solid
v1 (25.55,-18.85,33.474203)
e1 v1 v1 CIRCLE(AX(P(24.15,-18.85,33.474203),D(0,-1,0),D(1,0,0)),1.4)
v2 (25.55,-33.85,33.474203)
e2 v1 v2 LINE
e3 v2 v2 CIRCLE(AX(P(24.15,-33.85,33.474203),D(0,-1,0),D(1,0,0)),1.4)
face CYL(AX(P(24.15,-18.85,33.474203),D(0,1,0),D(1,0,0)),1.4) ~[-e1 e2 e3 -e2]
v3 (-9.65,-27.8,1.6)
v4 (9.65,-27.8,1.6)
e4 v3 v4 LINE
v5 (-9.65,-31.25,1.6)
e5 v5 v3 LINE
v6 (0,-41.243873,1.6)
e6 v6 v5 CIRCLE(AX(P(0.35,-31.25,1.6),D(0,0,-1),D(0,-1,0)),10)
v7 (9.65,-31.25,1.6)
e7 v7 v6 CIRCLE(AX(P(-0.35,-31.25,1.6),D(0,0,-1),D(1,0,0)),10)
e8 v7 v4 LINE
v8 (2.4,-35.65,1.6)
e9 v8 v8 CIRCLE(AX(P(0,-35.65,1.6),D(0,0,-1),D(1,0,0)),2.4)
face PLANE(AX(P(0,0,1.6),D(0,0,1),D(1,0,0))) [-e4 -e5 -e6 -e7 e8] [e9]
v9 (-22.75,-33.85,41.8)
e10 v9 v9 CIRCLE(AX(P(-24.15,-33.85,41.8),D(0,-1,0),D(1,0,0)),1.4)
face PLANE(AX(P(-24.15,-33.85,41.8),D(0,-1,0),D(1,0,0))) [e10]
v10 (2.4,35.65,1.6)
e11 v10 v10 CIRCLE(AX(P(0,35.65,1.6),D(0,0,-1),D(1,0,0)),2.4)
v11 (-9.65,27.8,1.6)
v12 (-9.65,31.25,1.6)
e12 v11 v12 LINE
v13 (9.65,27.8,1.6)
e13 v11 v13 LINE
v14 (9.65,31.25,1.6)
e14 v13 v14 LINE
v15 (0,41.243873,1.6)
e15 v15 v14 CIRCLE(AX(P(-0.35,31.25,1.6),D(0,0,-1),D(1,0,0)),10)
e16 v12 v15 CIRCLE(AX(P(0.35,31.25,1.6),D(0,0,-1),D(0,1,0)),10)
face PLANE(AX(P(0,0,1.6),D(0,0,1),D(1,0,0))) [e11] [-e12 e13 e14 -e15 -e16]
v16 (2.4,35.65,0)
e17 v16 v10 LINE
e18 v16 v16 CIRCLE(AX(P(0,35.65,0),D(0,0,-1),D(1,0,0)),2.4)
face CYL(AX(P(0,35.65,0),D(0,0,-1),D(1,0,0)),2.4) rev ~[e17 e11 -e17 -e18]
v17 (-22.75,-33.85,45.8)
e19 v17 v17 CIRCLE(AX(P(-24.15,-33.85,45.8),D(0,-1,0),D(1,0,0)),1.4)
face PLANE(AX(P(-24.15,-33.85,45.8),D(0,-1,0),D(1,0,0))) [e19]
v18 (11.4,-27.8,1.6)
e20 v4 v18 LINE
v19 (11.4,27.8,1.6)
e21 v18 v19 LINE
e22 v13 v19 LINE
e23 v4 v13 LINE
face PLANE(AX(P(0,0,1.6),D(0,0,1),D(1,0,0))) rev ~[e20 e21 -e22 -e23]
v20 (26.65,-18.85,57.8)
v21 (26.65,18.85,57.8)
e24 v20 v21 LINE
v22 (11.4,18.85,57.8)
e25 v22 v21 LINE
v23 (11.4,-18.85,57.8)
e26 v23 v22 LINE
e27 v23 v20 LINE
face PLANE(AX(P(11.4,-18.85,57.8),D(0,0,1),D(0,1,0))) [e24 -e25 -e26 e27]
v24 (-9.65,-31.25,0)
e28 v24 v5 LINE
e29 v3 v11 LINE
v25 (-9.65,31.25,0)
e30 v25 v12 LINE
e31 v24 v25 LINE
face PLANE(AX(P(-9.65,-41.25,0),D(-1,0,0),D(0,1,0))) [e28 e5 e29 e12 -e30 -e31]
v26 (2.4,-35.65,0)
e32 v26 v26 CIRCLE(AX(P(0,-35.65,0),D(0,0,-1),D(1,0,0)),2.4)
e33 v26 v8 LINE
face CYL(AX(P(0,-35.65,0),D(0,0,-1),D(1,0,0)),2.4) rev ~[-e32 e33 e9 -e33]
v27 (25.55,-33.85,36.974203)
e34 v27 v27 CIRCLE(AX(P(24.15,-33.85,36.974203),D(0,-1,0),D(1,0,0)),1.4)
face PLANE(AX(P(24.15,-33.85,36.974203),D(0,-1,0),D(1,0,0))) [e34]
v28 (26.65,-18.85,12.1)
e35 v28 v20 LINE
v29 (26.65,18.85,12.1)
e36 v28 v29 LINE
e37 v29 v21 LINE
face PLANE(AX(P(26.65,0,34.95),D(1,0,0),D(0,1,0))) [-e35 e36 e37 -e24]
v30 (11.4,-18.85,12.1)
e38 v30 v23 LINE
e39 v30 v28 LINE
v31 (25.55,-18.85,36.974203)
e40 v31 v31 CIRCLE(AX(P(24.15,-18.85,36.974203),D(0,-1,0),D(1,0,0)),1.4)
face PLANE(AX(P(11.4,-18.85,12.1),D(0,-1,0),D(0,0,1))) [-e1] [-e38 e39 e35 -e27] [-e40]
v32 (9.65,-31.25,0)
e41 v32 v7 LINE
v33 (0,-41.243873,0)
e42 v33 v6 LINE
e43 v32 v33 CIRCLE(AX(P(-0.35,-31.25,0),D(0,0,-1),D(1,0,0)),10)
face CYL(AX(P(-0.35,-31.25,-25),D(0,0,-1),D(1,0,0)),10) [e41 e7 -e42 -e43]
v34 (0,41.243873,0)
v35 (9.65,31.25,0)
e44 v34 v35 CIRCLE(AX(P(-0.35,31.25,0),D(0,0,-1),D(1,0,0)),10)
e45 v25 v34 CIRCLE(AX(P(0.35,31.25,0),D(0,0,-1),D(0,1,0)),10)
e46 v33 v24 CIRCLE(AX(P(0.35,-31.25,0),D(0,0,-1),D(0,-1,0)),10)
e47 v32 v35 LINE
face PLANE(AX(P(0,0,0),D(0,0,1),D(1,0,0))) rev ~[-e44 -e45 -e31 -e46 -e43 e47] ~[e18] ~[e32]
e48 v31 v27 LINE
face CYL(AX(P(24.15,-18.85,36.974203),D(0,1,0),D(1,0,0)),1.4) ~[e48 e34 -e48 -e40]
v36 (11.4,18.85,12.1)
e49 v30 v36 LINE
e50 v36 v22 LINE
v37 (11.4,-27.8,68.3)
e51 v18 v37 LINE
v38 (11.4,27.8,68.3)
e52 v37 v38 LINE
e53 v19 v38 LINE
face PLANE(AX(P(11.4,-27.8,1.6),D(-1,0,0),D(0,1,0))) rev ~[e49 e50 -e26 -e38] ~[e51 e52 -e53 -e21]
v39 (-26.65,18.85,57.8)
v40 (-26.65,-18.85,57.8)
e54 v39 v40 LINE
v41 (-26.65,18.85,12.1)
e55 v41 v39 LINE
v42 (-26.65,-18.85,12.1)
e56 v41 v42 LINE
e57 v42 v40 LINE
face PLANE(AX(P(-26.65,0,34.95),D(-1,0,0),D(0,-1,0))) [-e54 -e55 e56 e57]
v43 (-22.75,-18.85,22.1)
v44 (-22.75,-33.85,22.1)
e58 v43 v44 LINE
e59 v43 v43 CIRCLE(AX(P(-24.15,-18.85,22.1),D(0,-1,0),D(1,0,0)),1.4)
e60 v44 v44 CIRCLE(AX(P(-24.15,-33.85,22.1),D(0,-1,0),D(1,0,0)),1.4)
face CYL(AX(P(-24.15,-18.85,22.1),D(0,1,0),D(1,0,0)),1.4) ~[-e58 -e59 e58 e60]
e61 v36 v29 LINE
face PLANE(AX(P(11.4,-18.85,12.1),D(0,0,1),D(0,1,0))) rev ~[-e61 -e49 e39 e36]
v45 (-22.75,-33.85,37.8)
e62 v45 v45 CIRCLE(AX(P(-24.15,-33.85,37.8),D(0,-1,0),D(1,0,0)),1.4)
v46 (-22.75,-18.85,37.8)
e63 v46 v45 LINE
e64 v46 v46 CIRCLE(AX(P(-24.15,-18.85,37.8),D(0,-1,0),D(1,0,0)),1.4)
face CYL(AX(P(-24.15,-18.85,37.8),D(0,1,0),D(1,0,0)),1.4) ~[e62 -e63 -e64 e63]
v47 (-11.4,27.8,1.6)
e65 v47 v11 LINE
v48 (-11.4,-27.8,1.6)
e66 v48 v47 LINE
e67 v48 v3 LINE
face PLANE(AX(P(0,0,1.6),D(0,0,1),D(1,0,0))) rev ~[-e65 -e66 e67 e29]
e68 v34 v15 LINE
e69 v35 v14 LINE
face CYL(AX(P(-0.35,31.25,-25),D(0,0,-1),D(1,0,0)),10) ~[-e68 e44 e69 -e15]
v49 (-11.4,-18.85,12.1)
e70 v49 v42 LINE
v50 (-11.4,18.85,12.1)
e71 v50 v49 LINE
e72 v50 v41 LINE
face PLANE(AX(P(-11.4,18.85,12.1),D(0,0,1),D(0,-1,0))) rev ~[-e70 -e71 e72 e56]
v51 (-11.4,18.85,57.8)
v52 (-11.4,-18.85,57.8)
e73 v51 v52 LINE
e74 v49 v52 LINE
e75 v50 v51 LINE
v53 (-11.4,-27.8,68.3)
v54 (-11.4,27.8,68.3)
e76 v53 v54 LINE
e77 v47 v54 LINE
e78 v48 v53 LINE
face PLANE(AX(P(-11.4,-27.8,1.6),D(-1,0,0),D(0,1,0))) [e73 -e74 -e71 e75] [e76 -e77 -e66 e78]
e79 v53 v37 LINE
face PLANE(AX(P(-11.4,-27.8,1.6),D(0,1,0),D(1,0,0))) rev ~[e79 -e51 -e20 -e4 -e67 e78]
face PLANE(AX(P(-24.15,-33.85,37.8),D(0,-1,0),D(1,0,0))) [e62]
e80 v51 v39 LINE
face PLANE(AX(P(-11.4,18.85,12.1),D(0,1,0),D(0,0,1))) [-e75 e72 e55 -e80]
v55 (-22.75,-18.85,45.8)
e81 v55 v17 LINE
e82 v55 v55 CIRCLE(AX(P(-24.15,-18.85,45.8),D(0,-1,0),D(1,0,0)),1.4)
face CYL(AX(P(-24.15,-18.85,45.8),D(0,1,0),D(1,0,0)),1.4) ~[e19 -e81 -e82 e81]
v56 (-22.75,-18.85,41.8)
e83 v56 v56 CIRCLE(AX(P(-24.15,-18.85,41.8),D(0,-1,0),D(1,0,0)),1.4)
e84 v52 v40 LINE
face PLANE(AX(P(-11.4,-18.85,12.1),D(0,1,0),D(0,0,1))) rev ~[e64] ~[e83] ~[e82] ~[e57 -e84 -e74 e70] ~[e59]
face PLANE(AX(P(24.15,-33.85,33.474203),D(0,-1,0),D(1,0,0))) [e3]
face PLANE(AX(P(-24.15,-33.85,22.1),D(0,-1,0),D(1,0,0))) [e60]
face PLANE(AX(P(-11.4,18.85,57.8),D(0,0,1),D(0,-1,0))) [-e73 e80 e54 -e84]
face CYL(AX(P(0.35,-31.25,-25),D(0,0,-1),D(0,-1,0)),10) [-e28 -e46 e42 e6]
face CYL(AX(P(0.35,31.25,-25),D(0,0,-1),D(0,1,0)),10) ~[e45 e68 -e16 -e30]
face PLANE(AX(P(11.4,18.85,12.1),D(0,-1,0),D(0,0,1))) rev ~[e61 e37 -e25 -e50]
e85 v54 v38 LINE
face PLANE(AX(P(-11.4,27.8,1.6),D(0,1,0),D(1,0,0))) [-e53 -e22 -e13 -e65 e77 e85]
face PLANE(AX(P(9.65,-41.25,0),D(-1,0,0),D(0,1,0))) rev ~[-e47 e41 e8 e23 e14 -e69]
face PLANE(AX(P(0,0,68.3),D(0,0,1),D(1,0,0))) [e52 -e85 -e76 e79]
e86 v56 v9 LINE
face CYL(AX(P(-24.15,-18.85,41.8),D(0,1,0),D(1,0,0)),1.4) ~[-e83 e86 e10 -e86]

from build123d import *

# Parameters (mm, degrees)
F0_W         = 19.3
F0_H         = 82.5
F1_DEPTH     = 1.6
F2_W         = 22.8
F2_H         = 55.6
F3_DEPTH     = 66.7
F4_W         = 37.7
F4_H         = 45.7
F5_DEPTH     = 15.25
F6_W         = 37.7
F6_H         = 45.7
F7_DEPTH     = 15.25
F8_R         = 2.4
F9_DEPTH     = 68.301
F10_T1_DEPTH = 51.6
F11_R        = 1.4
F12_DEPTH    = 15
F13_R        = 1.4
F14_DEPTH    = 15


# Not quite as in the source:
# - a fillet or chamfer that OpenCascade refuses, or shapes differently, is made with other operations: its cross-section is extruded or revolved along the edge and cut away or added


with BuildPart() as f1:
    # F0 (on Top) → F1 (new body)
    with BuildSketch(Plane.XY):
        Rectangle(F0_W, F0_H)
    extrude(amount=F1_DEPTH)

    # F2 (on face) → F3 (join)
    with BuildSketch(Plane.XY.offset(1.6)):
        Rectangle(F2_W, F2_H)
    extrude(amount=F3_DEPTH)

    # F4 (on face) → F5 (join)
    with BuildSketch(Plane(origin=(-11.4, 0, 0), x_dir=(0, -1, 0), z_dir=(-1, 0, 0))):
        with Locations((0, 34.95)):
            Rectangle(F4_W, F4_H)
    extrude(amount=F5_DEPTH)

    # F6 (on face) → F7 (join)
    with BuildSketch(Plane.YZ.offset(11.4)):
        with Locations((0, 34.95)):
            Rectangle(F6_W, F6_H)
    extrude(amount=F7_DEPTH)

    # F8 (on face) → F9 (cut, through all)
    with BuildSketch(Plane(origin=(0, 0, 0), x_dir=(1, 0, 0), z_dir=(0, 0, -1))):
        with Locations((0, 35.65)):
            Circle(F8_R)
        with Locations((0, -35.65)):
            Circle(F8_R)
    extrude(amount=-F9_DEPTH, mode=Mode.SUBTRACT)

    # F10: fillet of radius 10 on 4 edges, made by hand

    # F10_s2 → F10_t1 (cut)
    with BuildSketch(Plane.XY.offset(-25)):
        with BuildLine():
            ThreePointArc((0.35, 41.25), (-6.7210678119, 38.3210678119), (-9.65, 31.25))
            Line((-9.65, 31.25), (-9.65, 41.25))
            Line((-9.65, 41.25), (0.35, 41.25))
        make_face()
        with BuildLine():
            ThreePointArc((9.65, 31.25), (6.7210678119, 38.3210678119), (-0.35, 41.25))
            Line((-0.35, 41.25), (9.65, 41.25))
            Line((9.65, 41.25), (9.65, 31.25))
        make_face()
        with BuildLine():
            ThreePointArc((9.65, -31.25), (6.7210678119, -38.3210678119), (-0.35, -41.25))
            Line((-0.35, -41.25), (9.65, -41.25))
            Line((9.65, -41.25), (9.65, -31.25))
        make_face()
        with BuildLine():
            ThreePointArc((0.35, -41.25), (-6.7210678119, -38.3210678119), (-9.65, -31.25))
            Line((-9.65, -31.25), (-9.65, -41.25))
            Line((-9.65, -41.25), (0.35, -41.25))
        make_face()
    extrude(amount=F10_T1_DEPTH, mode=Mode.SUBTRACT)

    # F11 (on face) → F12 (join)
    with BuildSketch(Plane.XZ.offset(18.85)):
        with Locations((-24.15, 41.8)):
            Circle(F11_R)
        with Locations((-24.15, 45.8)):
            Circle(F11_R)
        with Locations((-24.15, 37.8)):
            Circle(F11_R)
        with Locations((-24.15, 22.1)):
            Circle(F11_R)
    extrude(amount=F12_DEPTH)

    # F13 (on face) → F14 (join)
    with BuildSketch(Plane.XZ.offset(18.85)):
        with Locations((24.15, 36.9742031991)):
            Circle(F13_R)
        with Locations((24.15, 33.4742031991)):
            Circle(F13_R)
    extrude(amount=F14_DEPTH)


solid = f1.part
